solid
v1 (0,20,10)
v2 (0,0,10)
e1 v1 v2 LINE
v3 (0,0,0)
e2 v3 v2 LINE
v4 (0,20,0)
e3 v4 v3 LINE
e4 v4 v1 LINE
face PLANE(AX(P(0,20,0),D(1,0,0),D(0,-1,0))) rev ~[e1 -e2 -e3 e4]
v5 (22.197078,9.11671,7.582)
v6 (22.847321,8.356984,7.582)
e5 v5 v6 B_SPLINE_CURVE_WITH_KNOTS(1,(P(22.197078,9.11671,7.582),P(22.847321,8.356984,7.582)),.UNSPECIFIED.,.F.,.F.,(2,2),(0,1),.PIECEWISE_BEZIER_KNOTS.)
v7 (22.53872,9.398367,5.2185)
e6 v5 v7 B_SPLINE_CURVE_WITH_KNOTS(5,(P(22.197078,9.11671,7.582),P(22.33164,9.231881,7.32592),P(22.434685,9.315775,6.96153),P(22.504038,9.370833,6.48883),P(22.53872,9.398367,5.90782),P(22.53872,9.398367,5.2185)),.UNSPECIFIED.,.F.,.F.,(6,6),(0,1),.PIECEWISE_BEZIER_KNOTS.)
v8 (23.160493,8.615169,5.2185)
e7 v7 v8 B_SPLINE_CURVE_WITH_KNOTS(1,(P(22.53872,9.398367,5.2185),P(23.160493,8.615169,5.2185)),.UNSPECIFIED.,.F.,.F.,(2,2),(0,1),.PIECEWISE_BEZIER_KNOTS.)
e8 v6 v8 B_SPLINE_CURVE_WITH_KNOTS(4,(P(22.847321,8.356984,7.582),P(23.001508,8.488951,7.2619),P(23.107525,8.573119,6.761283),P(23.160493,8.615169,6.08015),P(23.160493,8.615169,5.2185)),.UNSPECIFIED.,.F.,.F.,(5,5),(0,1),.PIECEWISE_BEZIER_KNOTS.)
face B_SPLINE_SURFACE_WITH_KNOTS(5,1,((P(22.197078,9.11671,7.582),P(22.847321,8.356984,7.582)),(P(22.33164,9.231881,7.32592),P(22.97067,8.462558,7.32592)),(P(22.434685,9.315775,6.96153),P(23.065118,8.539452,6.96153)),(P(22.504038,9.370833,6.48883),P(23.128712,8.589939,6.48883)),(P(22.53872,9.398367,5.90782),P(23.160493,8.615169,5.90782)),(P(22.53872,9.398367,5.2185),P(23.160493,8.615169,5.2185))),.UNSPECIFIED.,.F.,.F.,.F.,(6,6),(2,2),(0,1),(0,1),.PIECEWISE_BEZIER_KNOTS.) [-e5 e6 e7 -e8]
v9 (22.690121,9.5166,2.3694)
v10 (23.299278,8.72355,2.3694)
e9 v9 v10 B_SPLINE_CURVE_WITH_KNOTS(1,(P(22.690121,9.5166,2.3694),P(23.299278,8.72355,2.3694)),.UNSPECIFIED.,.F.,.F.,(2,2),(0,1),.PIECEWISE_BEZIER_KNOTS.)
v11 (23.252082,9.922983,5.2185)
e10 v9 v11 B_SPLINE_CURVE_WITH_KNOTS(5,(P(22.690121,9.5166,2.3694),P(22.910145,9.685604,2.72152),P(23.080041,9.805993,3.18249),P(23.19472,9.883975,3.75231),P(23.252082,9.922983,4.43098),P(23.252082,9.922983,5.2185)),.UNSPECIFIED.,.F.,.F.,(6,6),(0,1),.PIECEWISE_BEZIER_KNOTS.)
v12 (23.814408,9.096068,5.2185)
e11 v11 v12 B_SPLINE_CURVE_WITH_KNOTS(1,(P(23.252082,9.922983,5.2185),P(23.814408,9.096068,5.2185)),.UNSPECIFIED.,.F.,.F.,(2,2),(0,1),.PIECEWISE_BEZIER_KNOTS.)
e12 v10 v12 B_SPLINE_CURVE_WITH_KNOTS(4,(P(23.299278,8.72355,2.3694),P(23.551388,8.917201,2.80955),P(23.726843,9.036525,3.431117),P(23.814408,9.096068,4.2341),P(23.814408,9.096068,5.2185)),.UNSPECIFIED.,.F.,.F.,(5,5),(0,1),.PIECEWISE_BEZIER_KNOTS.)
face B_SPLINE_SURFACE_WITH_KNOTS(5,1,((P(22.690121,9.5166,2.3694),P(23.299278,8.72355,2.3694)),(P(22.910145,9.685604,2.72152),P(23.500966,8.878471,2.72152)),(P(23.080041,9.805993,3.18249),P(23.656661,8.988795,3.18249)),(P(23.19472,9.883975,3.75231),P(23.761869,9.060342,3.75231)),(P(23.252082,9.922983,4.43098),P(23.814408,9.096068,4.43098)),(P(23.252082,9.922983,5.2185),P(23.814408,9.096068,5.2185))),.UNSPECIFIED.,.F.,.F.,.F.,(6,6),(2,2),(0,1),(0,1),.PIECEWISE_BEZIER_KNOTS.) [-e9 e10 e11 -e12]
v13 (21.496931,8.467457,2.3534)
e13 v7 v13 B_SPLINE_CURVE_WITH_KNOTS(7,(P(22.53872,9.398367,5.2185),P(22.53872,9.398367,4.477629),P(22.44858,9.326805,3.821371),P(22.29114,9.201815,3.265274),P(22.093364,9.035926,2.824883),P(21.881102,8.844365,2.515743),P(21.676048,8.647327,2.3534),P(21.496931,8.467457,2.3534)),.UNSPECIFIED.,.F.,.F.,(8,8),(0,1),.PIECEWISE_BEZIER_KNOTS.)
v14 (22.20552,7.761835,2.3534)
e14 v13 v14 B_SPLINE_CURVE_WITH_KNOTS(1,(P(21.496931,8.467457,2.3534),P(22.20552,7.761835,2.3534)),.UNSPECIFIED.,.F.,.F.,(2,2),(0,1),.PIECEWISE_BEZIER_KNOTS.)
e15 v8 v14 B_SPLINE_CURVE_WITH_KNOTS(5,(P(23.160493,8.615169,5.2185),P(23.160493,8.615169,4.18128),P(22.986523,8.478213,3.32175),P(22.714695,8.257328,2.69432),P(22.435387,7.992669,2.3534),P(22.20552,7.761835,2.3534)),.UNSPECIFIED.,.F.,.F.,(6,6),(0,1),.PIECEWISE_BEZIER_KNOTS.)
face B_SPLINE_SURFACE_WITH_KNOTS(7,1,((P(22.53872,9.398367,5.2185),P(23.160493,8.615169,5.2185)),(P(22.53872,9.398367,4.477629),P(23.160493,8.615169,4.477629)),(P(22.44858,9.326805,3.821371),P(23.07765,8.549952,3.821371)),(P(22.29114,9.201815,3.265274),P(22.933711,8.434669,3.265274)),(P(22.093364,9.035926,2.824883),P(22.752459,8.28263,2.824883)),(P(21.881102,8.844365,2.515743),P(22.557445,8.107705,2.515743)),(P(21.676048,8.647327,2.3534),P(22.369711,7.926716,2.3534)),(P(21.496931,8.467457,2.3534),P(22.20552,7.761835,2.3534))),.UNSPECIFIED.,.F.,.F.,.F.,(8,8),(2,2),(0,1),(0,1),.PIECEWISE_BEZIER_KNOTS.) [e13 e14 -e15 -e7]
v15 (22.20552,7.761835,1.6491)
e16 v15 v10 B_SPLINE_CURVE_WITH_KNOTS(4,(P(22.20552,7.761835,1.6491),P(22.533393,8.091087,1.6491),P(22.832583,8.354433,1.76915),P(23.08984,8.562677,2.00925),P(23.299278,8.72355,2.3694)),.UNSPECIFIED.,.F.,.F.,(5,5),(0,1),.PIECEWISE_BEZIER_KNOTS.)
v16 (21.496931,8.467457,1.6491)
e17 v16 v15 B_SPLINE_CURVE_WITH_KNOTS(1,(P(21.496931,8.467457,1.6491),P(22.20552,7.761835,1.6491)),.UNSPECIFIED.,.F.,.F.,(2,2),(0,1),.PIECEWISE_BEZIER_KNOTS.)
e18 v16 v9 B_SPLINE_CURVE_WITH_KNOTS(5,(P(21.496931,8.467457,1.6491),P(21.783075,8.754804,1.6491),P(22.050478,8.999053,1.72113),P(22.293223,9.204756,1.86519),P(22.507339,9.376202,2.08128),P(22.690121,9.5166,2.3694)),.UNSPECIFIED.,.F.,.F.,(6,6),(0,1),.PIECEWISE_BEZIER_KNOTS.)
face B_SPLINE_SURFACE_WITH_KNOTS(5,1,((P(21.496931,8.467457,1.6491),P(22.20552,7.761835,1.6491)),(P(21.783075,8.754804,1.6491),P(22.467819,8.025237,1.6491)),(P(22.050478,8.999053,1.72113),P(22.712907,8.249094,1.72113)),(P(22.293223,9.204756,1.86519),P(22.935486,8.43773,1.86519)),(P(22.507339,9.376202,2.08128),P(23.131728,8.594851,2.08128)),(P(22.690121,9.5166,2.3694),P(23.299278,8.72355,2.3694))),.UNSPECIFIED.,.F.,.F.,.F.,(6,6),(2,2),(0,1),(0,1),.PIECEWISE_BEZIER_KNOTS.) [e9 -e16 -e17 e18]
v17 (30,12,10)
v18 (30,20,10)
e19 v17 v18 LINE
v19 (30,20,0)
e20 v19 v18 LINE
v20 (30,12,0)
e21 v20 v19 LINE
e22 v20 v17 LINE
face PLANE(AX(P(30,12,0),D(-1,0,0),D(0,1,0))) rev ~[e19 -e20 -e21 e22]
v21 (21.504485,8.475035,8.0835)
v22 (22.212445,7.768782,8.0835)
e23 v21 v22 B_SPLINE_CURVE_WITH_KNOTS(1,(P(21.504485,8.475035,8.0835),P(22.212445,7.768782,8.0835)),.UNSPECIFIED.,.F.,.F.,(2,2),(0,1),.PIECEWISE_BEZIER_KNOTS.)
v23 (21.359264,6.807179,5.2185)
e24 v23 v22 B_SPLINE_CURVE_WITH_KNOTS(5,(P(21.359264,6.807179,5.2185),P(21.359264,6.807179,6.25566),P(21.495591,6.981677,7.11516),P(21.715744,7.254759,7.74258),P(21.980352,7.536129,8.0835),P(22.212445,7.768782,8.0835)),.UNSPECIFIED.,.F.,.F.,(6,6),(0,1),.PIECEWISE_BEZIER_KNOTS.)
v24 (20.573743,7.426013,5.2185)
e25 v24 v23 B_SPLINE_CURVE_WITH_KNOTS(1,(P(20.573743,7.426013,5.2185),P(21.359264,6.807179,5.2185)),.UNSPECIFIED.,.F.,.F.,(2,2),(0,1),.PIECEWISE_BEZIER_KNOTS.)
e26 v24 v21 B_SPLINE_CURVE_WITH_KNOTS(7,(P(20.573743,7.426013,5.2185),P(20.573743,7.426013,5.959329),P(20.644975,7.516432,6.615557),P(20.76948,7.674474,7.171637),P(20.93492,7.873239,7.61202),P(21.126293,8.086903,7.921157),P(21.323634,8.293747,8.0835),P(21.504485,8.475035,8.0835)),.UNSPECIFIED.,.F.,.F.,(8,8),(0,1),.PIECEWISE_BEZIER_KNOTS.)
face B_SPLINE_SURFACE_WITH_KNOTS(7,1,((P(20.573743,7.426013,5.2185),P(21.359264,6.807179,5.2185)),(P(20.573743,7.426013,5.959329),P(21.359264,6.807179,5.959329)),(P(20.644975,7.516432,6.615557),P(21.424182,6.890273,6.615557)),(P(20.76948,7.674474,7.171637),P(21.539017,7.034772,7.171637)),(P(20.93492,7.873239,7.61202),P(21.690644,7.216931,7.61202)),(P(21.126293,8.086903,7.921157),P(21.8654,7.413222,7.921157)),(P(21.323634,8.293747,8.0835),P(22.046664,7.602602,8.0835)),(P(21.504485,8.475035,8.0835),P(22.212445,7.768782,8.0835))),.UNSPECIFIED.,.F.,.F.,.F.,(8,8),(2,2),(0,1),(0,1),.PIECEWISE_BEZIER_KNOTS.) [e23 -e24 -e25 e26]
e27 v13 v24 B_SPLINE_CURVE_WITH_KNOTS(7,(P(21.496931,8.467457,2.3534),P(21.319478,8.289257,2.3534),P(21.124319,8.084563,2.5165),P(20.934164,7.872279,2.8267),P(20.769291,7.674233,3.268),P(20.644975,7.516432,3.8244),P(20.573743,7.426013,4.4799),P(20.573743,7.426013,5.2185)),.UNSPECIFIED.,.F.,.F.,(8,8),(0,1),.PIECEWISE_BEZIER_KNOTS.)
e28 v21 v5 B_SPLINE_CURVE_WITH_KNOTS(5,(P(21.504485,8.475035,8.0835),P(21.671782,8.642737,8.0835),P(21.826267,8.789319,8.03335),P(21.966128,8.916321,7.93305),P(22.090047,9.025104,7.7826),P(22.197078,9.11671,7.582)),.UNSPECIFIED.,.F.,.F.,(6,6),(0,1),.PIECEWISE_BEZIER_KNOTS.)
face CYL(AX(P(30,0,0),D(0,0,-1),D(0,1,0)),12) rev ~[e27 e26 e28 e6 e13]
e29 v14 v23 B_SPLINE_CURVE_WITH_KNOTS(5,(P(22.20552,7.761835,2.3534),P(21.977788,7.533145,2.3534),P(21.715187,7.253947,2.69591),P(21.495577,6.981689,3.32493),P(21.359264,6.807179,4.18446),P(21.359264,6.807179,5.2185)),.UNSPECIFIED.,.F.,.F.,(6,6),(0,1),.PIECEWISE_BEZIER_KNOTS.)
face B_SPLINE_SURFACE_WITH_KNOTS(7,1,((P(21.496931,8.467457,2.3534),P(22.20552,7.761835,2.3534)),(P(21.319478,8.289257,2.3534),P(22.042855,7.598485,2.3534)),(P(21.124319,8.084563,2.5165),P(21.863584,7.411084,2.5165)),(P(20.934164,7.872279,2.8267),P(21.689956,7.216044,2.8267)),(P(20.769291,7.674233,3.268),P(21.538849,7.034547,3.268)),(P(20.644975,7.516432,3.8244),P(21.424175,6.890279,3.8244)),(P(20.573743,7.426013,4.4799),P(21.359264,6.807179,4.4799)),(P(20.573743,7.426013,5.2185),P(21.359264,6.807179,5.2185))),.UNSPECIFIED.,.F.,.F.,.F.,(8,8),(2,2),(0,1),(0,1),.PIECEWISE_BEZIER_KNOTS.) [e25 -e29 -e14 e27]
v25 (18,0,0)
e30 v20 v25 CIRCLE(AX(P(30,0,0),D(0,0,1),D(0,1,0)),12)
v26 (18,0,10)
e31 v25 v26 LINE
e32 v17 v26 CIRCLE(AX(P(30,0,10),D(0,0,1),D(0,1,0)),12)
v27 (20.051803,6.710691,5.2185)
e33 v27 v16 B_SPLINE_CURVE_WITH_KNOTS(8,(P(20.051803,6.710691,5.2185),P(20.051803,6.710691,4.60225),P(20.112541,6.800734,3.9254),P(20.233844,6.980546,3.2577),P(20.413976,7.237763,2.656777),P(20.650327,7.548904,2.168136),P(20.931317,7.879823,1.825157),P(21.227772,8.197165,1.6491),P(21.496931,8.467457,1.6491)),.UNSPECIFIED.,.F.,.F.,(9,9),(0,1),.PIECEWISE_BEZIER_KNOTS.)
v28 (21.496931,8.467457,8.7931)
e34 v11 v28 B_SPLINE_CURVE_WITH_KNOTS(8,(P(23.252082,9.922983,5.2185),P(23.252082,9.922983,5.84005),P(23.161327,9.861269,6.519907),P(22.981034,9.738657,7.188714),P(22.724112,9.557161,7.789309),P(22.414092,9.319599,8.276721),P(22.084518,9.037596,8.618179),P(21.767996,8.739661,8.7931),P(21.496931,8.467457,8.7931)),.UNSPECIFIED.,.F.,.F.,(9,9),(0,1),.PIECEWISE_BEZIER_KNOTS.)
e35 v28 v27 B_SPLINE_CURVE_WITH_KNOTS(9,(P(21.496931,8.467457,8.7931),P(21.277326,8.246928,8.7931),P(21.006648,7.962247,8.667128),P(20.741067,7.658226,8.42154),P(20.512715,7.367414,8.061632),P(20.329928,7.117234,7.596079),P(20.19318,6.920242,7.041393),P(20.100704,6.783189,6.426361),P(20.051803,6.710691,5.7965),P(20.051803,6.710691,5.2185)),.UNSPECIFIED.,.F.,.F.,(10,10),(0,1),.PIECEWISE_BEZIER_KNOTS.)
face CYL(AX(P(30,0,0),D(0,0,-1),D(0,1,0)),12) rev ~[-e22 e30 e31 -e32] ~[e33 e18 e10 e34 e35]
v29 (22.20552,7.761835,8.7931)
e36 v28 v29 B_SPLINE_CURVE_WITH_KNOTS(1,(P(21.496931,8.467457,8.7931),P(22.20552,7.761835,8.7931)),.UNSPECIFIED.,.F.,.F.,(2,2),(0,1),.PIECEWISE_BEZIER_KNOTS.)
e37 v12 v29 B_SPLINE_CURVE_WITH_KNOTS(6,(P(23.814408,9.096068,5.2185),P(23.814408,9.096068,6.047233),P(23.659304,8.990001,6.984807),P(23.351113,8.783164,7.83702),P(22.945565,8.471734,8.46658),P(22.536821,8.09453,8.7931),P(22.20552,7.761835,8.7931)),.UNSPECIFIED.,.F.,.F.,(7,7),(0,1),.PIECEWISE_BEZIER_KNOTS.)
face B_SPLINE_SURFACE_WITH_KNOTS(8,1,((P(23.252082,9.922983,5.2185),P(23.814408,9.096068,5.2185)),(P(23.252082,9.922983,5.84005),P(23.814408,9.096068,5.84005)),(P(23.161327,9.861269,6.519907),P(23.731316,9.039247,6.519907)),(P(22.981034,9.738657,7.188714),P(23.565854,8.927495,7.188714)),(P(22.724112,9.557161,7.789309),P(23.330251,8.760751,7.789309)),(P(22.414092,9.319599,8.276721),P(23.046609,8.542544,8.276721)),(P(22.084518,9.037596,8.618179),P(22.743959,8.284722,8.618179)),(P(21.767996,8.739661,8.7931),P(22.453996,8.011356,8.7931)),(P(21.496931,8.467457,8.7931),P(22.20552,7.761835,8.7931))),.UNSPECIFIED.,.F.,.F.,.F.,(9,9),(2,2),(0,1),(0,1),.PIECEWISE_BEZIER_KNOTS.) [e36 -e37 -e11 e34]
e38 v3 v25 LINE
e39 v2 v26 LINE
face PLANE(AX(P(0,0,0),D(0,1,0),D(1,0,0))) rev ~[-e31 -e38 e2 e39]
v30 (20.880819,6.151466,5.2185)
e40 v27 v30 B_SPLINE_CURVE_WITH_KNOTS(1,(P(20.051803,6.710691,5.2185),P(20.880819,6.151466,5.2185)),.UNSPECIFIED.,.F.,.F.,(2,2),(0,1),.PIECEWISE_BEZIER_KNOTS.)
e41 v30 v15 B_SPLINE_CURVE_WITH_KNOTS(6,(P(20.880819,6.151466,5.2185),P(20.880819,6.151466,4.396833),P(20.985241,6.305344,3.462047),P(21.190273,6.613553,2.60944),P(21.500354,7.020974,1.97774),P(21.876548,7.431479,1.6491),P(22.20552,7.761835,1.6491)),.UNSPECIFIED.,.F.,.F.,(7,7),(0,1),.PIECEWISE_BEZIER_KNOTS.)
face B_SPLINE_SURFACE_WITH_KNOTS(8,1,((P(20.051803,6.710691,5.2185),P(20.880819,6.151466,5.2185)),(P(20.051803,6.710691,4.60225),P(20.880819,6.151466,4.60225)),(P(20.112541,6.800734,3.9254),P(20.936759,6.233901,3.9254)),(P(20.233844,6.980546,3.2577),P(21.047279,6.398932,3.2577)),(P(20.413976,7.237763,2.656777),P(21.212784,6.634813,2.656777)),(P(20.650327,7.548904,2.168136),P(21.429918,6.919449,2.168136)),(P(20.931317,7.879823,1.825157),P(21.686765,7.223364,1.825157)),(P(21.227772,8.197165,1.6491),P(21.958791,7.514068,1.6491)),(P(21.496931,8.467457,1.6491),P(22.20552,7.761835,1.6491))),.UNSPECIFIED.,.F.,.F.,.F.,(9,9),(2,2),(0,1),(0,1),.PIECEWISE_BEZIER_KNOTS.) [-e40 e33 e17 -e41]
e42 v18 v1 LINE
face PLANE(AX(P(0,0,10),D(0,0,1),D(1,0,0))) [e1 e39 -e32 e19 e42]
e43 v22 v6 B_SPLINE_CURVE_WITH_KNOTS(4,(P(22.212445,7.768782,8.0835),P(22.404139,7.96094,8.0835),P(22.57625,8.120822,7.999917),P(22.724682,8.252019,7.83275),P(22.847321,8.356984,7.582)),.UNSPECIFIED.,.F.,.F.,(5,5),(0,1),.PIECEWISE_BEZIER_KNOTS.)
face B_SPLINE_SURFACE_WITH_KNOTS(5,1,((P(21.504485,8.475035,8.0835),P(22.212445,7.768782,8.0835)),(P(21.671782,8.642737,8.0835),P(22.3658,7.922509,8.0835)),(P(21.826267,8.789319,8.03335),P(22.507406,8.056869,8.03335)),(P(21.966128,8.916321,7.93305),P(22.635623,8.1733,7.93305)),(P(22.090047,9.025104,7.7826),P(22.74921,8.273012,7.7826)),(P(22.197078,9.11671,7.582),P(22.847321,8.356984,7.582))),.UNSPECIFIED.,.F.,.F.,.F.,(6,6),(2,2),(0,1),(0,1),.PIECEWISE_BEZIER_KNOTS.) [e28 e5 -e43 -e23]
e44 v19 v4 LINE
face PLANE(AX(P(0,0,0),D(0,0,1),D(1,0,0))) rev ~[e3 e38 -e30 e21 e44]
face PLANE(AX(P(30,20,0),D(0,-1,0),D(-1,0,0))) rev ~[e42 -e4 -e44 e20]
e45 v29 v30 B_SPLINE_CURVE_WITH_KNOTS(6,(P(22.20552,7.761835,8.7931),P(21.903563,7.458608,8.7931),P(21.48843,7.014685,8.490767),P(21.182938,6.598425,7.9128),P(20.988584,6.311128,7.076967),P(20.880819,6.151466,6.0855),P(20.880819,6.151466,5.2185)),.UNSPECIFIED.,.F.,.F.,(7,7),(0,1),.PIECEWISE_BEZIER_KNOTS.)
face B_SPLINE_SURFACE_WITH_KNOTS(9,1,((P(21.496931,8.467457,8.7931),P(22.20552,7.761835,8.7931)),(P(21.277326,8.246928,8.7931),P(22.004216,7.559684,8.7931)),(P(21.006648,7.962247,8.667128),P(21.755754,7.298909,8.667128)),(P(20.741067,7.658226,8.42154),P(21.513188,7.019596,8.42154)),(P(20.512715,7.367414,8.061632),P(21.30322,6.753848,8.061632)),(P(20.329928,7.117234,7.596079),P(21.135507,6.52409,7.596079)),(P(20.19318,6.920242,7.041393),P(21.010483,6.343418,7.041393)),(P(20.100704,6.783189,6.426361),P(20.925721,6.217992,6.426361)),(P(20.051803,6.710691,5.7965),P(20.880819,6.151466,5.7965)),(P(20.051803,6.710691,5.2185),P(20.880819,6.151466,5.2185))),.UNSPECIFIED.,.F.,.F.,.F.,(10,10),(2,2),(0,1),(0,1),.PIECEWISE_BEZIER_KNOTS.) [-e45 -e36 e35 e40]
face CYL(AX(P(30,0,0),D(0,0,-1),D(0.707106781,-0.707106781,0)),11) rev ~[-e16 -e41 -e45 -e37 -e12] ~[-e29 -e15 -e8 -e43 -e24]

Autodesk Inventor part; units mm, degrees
ref_plane "YZ Plane" through (0, 0, 0) normal (1, 0, 0) x (0, 1, 0)
ref_plane "XZ Plane" through (0, 0, 0) normal (0, 1, 0) x (-1, 0, 0)
sketch "Sketch1" plane through (0, 0, 0) normal (0, 0, 1) x (1, 0, 0)
  line L0 (0, 0) -> (18, 0)
  line L1 (30, 12) -> (30, 20)
  line L2 (30, 20) -> (0, 20)
  line L3 (0, 20) -> (0, 0)
  arc A0 (30, 12) -> (18, 0) centre (30, 0) ccw
  dimension "d0" = 30
  dimension "d1" = 20
  dimension "d2" = 12
extrude "Extrusion1" add sketch "Sketch1" along normal blind 10
sketch "Sketch2" plane through (0, 0, 0) normal (0, -1, 0) x (1, 0, 0)
  line L0 (6.7288, 8.7537) -> (12.1656, 8.7537) construction
  line L1 (12.1656, 8.7537) -> (12.1656, 1.727) construction
  line L2 (12.1656, 1.727) -> (6.7288, 1.727) construction
  line L3 (6.7288, 1.727) -> (6.7288, 8.7537) construction
sketch "Sketch3" plane through (30, 12, 0) normal (1, 0, 0) x (0, 0, -1)
  line L0 (-8.6261, 1.3146) -> (-8.6261, 6.7514) construction
  line L1 (-8.6261, 6.7514) -> (-1.482, 6.7514) construction
  line L2 (-1.482, 6.7514) -> (-1.482, 1.3146) construction
  line L3 (-1.482, 1.3146) -> (-8.6261, 1.3146) construction
sketch "Sketch4" plane through (0, 20, 0) normal (0, 1, 0) x (1, 0, 0)
  line L0 (16.9923, -8.3919) -> (11.5555, -8.3919) construction
  line L1 (11.5555, -8.3919) -> (11.5555, -1.3919) construction
  line L2 (11.5555, -1.3919) -> (16.9923, -1.3919) construction
  line L3 (16.9923, -1.3919) -> (16.9923, -8.3919) construction
sketch "Sketch5" plane through (0, 0, 0) normal (-1, 0, 0) x (0, 0, 1)
  line L0 (8.5269, 13.0876) -> (8.5269, 7.6509) construction
  line L1 (8.5269, 7.6509) -> (1.5002, 7.6509) construction
  line L2 (1.5002, 7.6509) -> (1.5002, 13.0876) construction
  line L3 (1.5002, 13.0876) -> (8.5269, 13.0876) construction
sketch "Sketch6" plane through (0, 0, 10) normal (0, 0, 1) x (1, 0, 0)
  line L0 (8.4775, 14.4017) -> (13.9142, 14.4017) construction
  line L1 (13.9142, 14.4017) -> (13.9142, 7.4924) construction
  line L2 (13.9142, 7.4924) -> (8.4775, 7.4924) construction
  line L3 (8.4775, 7.4924) -> (8.4775, 14.4017) construction
sketch "Sketch7" plane through (0, 0, 0) normal (0, 0, -1) x (-1, 0, 0)
  line L0 (-16.3171, 15.4982) -> (-10.8803, 15.4982) construction
  line L1 (-10.8803, 15.4982) -> (-10.8803, 8.3541) construction
  line L2 (-10.8803, 8.3541) -> (-16.3171, 8.3541) construction
  line L3 (-16.3171, 8.3541) -> (-16.3171, 15.4982) construction
ref_plane "Work Plane1" through (18, 0, 0) normal (-0.7071068, 0.7071068, 0) x (0, 0, 1)
sketch "Sketch9" plane through (18, 0, 0) normal (-0.7071068, 0.7071068, 0) x (0, 0, 1)
  line L0 (8.7931, 11.1492) -> (8.7931, 5.7124) construction
  line L1 (8.7931, 5.7124) -> (1.7665, 5.7124) construction
  line L2 (1.7665, 5.7124) -> (1.7665, 11.1492) construction
  line L3 (1.7665, 11.1492) -> (8.7931, 11.1492) construction
  spline S0 degree 4 poles (5.2185, 10.7437) (6.4616, 10.7437) (7.9768, 10.2315) (8.7931, 9.2284) (8.7931, 8.4601) knots 0 0 0 0 0 1 1 1 1 1
  spline S1 degree 5 poles (8.7931, 8.4601) (8.7931, 7.8999) (8.3396, 7.0463) (7.486, 6.4967) (6.2589, 6.1819) (5.2185, 6.1819) knots 0 0 0 0 0 0 1 1 1 1 1 1
  spline S2 degree 4 poles (5.2185, 6.1819) (3.986, 6.1819) (2.4707, 6.6888) (1.6491, 7.6972) (1.6491, 8.4601) knots 0 0 0 0 0 1 1 1 1 1
  spline S3 degree 2 poles (1.6491, 8.4601) (1.6491, 9.4739) (2.3694, 10.0501) knots 0 0 0 1 1 1
  spline S4 degree 2 poles (2.3694, 10.0501) (3.2497, 10.7437) (5.2185, 10.7437) knots 0 0 0 1 1 1
  spline S5 degree 3 poles (5.2185, 9.858) (3.4898, 9.858) (2.3534, 9.0524) (2.3534, 8.4601) knots 0 0 0 0 1 1 1 1
  spline S6 degree 3 poles (2.3534, 8.4601) (2.3534, 7.8733) (3.4951, 7.0676) (5.2185, 7.0676) knots 0 0 0 0 1 1 1 1
  spline S7 degree 3 poles (5.2185, 7.0676) (6.9471, 7.0676) (8.0835, 7.8733) (8.0835, 8.4708) knots 0 0 0 0 1 1 1 1
  spline S8 degree 2 poles (8.0835, 8.4708) (8.0835, 9.063) (7.582, 9.4152) knots 0 0 0 1 1 1
  spline S9 degree 2 poles (7.582, 9.4152) (6.9418, 9.858) (5.2185, 9.858) knots 0 0 0 1 1 1
emboss "Emboss1" sketch "Sketch9" operation add depth 1 direction (0.7071068, -0.7071068, 0) wrap yes faces at (21.8379, 8.7966, 6.6667)
properties part number "block"
